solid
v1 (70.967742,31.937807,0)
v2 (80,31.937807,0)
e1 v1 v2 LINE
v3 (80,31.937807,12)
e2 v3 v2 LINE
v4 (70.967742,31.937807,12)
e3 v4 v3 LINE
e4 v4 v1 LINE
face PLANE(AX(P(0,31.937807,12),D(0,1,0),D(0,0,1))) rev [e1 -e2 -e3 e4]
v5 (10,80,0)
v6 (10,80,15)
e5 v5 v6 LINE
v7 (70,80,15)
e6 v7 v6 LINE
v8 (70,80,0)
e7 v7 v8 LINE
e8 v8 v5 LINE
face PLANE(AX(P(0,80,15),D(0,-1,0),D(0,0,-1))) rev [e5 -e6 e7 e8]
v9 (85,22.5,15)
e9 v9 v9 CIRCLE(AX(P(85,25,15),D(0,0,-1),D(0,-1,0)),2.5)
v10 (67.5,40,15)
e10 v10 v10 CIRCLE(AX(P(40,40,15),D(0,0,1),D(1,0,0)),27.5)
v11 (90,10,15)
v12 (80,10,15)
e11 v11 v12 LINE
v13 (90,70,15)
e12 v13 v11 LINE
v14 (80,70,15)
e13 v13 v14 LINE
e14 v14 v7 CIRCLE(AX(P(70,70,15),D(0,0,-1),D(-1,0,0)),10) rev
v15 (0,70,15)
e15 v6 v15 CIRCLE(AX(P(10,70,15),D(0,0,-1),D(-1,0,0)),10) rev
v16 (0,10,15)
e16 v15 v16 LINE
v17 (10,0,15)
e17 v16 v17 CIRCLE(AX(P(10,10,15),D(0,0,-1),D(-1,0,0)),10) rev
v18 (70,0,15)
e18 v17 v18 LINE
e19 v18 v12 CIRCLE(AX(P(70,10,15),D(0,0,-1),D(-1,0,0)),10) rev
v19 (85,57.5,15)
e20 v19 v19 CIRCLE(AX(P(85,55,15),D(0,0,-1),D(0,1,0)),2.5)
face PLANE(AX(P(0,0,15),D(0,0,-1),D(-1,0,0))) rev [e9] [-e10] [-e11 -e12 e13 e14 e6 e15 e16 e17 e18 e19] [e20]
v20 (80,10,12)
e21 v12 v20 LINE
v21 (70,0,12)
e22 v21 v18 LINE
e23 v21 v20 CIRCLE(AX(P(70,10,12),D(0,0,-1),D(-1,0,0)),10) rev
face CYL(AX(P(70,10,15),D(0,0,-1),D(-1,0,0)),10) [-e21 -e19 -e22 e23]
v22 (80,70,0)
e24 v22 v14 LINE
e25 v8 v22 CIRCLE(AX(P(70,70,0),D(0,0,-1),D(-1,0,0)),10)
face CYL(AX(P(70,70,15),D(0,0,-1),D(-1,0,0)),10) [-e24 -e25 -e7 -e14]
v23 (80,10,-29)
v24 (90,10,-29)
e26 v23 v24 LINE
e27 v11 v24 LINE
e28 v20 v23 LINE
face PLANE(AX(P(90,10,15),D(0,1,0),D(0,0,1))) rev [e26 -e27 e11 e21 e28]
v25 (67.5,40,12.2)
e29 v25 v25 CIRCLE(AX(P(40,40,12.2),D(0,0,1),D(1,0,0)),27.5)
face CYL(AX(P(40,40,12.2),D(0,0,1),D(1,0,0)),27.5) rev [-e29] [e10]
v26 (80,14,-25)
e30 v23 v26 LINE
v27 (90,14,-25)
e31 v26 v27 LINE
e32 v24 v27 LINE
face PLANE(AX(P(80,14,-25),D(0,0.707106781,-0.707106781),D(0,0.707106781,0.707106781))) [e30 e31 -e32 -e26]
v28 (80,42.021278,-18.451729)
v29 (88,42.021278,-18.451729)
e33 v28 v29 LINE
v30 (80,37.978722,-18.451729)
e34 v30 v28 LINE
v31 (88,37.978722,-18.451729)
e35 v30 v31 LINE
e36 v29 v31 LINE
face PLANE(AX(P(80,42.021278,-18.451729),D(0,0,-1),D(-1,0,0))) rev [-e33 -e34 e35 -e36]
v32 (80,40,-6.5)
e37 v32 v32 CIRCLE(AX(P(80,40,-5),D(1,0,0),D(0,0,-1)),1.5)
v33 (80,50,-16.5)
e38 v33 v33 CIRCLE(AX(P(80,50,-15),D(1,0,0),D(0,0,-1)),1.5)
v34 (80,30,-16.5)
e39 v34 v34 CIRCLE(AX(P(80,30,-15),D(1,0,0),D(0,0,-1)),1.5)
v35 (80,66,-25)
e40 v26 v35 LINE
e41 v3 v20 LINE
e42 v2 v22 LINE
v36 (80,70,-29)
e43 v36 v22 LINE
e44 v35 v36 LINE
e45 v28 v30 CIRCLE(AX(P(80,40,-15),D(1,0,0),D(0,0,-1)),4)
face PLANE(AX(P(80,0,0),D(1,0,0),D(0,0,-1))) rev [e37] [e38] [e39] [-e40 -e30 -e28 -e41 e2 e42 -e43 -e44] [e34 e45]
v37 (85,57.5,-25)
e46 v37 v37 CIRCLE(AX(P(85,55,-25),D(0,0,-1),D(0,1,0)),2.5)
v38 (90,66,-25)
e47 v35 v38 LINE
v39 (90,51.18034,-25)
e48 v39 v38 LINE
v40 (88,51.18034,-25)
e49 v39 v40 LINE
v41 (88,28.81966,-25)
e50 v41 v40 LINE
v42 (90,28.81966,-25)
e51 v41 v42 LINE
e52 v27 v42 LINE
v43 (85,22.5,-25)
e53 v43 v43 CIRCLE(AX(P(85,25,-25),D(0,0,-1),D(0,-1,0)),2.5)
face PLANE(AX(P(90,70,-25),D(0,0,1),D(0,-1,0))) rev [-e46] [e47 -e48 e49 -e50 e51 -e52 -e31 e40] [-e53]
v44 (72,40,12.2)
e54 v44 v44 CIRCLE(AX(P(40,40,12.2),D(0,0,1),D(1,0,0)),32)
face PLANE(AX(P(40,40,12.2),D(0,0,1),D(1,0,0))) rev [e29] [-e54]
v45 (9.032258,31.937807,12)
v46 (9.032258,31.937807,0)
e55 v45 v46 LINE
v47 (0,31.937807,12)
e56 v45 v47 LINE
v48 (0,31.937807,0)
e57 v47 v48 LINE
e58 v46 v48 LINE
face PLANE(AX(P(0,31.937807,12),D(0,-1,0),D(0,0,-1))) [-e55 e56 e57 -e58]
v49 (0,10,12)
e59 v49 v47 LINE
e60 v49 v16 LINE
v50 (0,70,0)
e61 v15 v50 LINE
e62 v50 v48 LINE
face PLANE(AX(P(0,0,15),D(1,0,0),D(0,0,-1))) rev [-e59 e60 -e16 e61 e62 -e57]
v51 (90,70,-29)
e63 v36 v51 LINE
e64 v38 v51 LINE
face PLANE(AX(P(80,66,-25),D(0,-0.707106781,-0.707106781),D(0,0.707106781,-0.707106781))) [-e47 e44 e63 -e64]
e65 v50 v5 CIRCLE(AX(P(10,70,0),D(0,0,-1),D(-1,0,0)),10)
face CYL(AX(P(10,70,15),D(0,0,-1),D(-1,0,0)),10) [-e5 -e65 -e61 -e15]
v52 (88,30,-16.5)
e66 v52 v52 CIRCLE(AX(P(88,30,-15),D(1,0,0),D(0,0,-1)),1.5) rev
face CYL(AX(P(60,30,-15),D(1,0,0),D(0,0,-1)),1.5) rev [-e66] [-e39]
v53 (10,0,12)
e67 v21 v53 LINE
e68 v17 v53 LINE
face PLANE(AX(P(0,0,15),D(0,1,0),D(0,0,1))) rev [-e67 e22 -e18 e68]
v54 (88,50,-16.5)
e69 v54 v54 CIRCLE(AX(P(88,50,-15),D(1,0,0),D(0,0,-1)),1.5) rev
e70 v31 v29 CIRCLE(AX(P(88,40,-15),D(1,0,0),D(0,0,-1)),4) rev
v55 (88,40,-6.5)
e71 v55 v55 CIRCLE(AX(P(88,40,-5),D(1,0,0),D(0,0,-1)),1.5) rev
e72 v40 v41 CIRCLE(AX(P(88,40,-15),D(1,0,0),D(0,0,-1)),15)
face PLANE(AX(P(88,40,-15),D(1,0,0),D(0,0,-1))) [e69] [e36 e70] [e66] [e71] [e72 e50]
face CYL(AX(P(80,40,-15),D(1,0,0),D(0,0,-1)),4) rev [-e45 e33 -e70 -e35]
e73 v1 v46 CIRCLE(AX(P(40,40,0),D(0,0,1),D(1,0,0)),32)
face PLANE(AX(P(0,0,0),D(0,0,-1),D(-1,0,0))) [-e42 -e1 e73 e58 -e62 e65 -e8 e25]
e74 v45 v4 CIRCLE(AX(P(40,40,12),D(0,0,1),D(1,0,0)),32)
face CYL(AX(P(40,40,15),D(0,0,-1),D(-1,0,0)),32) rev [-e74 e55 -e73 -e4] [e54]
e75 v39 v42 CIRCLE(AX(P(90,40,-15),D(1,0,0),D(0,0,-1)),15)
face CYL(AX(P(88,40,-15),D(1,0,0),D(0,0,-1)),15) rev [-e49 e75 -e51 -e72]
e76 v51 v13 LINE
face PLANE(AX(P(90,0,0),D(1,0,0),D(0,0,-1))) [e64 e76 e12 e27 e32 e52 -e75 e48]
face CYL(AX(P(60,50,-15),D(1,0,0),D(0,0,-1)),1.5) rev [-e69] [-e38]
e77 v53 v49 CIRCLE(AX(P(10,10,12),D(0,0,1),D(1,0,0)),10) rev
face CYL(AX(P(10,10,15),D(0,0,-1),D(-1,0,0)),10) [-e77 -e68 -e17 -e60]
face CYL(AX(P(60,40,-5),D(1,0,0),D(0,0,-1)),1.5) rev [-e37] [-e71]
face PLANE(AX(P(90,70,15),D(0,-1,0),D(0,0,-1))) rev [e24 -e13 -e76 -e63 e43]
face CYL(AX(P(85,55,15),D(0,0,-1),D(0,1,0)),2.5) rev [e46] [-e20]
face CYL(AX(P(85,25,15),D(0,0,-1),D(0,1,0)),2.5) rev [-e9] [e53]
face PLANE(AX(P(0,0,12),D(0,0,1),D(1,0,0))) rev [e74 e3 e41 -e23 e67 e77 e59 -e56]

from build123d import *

# Parameters (mm, degrees)
SKETCH1_W           = 80
SKETCH1_H           = 80
SKETCH1_R           = 32
BOSS_EXTRUDE1_DEPTH = 15
BOSS_EXTRUDE2_START = -2.8
SKETCH2_R           = 32
SKETCH2_R_2         = 27.5
BOSS_EXTRUDE2_DEPTH = 2.8
FILLET1_R           = 10
SKETCH4_W           = 40
SKETCH4_H           = 60
BOSS_EXTRUDE3_DEPTH = 10
SKETCH10_R          = 2.5
CUT_EXTRUDE2_DEPTH  = 127.885775404
BOSS_EXTRUDE7_DEPTH = 10
CUT_EXTRUDE3_DEPTH  = 10
SKETCH13_R          = 1.5
CUT_EXTRUDE5_DEPTH  = 30
SKETCH14_R          = 15
CUT_EXTRUDE6_DEPTH  = 2
SKETCH16_W          = 60.967741935
SKETCH16_H          = 31.937806786
CUT_EXTRUDE10_DEPTH = 12
SKETCH17_W          = 80
SKETCH17_H          = 10
CUT_EXTRUDE11_DEPTH = 12
SKETCH18_R          = 2
CUT_EXTRUDE12_DEPTH = 20
CUT_EXTRUDE14_DEPTH = 12


with BuildPart() as part:
    # Sketch1 → Boss-Extrude1 (new body)
    with BuildSketch(Plane.XY):
        with Locations((40, 40)):
            Rectangle(SKETCH1_W, SKETCH1_H)
        with Locations((40, 40)):
            Circle(SKETCH1_R, mode=Mode.SUBTRACT)
    extrude(amount=BOSS_EXTRUDE1_DEPTH)

    # Sketch2 → Boss-Extrude2 (add)
    with BuildSketch(Plane.XY.offset(15).offset(BOSS_EXTRUDE2_START)):
        with Locations((40, 40)):
            Circle(SKETCH2_R)
        with Locations((40, 40)):
            Circle(SKETCH2_R_2, mode=Mode.SUBTRACT)
    extrude(amount=BOSS_EXTRUDE2_DEPTH)

    # Fillet1
    fillet1_edges = [part.edges().sort_by_distance(p)[0] for p in [
        (80, 0, 7.5),
        (0, 0, 7.5),
        (0, 80, 7.5),
        (80, 80, 7.5),
    ]]
    fillet(fillet1_edges, radius=FILLET1_R)

    # Sketch4 → Boss-Extrude3 (add)
    with BuildSketch(Plane(origin=(80, 0, 0), x_dir=(0, 0, -1), z_dir=(1, 0, 0))):
        with Locations((5, 40)):
            Rectangle(SKETCH4_W, SKETCH4_H)
    extrude(amount=BOSS_EXTRUDE3_DEPTH)

    # Sketch10 → Cut-Extrude2 (cut, through all)
    with BuildSketch(Plane(origin=(0, 0, -25), x_dir=(-1, 0, 0), z_dir=(0, 0, -1))):
        with Locations((-85, 55)):
            Circle(SKETCH10_R)
        with Locations((-85, 25)):
            Circle(SKETCH10_R)
    extrude(amount=-CUT_EXTRUDE2_DEPTH, mode=Mode.SUBTRACT)

    # Sketch11 → Boss-Extrude7 (add)
    with BuildSketch(Plane(origin=(90, 0, 0), x_dir=(0, 0, -1), z_dir=(1, 0, 0))):
        Polygon((25, 70), (25, 66), (29, 70), align=None)
        Polygon((25, 14), (29, 10), (25, 10), align=None)
    extrude(amount=-BOSS_EXTRUDE7_DEPTH)

    # Sketch12 → Cut-Extrude3 (cut)
    with BuildSketch(Plane(origin=(90, 0, 0), x_dir=(0, 0, -1), z_dir=(1, 0, 0))):
        with BuildLine():
            Line((18.45172909, 42.02127838), (18.45172909, 37.97872162))
            ThreePointArc((18.45172909, 37.97872162), (11, 40), (18.45172909, 42.02127838))
        make_face()
    extrude(amount=-CUT_EXTRUDE3_DEPTH, mode=Mode.SUBTRACT)

    # Sketch13 → Cut-Extrude5 (cut)
    with BuildSketch(Plane(origin=(90, 0, 0), x_dir=(0, 0, -1), z_dir=(1, 0, 0))):
        with Locations((15, 50)):
            Circle(SKETCH13_R)
        with Locations((15, 30)):
            Circle(SKETCH13_R)
        with Locations((5, 40)):
            Circle(SKETCH13_R)
    extrude(amount=-CUT_EXTRUDE5_DEPTH, mode=Mode.SUBTRACT)

    # Sketch14 → Cut-Extrude6 (cut)
    with BuildSketch(Plane(origin=(90, 0, 0), x_dir=(0, 0, -1), z_dir=(1, 0, 0))):
        with Locations((15, 40)):
            Circle(SKETCH14_R)
    extrude(amount=-CUT_EXTRUDE6_DEPTH, mode=Mode.SUBTRACT)

    # Sketch16 → Cut-Extrude10 (cut)
    with BuildSketch(Plane(origin=(0, 0, 0), x_dir=(-1, 0, 0), z_dir=(0, 0, -1))):
        with Locations((-39.516129033, 15.968903393)):
            Rectangle(SKETCH16_W, SKETCH16_H)
    extrude(amount=-CUT_EXTRUDE10_DEPTH, mode=Mode.SUBTRACT)

    # Sketch17 → Cut-Extrude11 (cut)
    with BuildSketch(Plane(origin=(0, 0, 0), x_dir=(-1, 0, 0), z_dir=(0, 0, -1))):
        with Locations((-40, 5)):
            Rectangle(SKETCH17_W, SKETCH17_H)
    extrude(amount=-CUT_EXTRUDE11_DEPTH, mode=Mode.SUBTRACT)

    # Sketch18 → Cut-Extrude12 (cut)
    with BuildSketch(Plane.XZ.offset(-10)):
        with Locations((5, 6)):
            Circle(SKETCH18_R)
        with Locations((75, 6)):
            Circle(SKETCH18_R)
    extrude(amount=-CUT_EXTRUDE12_DEPTH, mode=Mode.SUBTRACT)

    # Sketch21 → Cut-Extrude14 (cut)
    with BuildSketch(Plane(origin=(0, 0, 0), x_dir=(-1, 0, 0), z_dir=(0, 0, -1))):
        Polygon((0, 31.937806786), (-70.967741935, 31.937806786), (-80, 31.937806786), (-80, 0), (0, 0), align=None)
    extrude(amount=-CUT_EXTRUDE14_DEPTH, mode=Mode.SUBTRACT)


solid = part.part
